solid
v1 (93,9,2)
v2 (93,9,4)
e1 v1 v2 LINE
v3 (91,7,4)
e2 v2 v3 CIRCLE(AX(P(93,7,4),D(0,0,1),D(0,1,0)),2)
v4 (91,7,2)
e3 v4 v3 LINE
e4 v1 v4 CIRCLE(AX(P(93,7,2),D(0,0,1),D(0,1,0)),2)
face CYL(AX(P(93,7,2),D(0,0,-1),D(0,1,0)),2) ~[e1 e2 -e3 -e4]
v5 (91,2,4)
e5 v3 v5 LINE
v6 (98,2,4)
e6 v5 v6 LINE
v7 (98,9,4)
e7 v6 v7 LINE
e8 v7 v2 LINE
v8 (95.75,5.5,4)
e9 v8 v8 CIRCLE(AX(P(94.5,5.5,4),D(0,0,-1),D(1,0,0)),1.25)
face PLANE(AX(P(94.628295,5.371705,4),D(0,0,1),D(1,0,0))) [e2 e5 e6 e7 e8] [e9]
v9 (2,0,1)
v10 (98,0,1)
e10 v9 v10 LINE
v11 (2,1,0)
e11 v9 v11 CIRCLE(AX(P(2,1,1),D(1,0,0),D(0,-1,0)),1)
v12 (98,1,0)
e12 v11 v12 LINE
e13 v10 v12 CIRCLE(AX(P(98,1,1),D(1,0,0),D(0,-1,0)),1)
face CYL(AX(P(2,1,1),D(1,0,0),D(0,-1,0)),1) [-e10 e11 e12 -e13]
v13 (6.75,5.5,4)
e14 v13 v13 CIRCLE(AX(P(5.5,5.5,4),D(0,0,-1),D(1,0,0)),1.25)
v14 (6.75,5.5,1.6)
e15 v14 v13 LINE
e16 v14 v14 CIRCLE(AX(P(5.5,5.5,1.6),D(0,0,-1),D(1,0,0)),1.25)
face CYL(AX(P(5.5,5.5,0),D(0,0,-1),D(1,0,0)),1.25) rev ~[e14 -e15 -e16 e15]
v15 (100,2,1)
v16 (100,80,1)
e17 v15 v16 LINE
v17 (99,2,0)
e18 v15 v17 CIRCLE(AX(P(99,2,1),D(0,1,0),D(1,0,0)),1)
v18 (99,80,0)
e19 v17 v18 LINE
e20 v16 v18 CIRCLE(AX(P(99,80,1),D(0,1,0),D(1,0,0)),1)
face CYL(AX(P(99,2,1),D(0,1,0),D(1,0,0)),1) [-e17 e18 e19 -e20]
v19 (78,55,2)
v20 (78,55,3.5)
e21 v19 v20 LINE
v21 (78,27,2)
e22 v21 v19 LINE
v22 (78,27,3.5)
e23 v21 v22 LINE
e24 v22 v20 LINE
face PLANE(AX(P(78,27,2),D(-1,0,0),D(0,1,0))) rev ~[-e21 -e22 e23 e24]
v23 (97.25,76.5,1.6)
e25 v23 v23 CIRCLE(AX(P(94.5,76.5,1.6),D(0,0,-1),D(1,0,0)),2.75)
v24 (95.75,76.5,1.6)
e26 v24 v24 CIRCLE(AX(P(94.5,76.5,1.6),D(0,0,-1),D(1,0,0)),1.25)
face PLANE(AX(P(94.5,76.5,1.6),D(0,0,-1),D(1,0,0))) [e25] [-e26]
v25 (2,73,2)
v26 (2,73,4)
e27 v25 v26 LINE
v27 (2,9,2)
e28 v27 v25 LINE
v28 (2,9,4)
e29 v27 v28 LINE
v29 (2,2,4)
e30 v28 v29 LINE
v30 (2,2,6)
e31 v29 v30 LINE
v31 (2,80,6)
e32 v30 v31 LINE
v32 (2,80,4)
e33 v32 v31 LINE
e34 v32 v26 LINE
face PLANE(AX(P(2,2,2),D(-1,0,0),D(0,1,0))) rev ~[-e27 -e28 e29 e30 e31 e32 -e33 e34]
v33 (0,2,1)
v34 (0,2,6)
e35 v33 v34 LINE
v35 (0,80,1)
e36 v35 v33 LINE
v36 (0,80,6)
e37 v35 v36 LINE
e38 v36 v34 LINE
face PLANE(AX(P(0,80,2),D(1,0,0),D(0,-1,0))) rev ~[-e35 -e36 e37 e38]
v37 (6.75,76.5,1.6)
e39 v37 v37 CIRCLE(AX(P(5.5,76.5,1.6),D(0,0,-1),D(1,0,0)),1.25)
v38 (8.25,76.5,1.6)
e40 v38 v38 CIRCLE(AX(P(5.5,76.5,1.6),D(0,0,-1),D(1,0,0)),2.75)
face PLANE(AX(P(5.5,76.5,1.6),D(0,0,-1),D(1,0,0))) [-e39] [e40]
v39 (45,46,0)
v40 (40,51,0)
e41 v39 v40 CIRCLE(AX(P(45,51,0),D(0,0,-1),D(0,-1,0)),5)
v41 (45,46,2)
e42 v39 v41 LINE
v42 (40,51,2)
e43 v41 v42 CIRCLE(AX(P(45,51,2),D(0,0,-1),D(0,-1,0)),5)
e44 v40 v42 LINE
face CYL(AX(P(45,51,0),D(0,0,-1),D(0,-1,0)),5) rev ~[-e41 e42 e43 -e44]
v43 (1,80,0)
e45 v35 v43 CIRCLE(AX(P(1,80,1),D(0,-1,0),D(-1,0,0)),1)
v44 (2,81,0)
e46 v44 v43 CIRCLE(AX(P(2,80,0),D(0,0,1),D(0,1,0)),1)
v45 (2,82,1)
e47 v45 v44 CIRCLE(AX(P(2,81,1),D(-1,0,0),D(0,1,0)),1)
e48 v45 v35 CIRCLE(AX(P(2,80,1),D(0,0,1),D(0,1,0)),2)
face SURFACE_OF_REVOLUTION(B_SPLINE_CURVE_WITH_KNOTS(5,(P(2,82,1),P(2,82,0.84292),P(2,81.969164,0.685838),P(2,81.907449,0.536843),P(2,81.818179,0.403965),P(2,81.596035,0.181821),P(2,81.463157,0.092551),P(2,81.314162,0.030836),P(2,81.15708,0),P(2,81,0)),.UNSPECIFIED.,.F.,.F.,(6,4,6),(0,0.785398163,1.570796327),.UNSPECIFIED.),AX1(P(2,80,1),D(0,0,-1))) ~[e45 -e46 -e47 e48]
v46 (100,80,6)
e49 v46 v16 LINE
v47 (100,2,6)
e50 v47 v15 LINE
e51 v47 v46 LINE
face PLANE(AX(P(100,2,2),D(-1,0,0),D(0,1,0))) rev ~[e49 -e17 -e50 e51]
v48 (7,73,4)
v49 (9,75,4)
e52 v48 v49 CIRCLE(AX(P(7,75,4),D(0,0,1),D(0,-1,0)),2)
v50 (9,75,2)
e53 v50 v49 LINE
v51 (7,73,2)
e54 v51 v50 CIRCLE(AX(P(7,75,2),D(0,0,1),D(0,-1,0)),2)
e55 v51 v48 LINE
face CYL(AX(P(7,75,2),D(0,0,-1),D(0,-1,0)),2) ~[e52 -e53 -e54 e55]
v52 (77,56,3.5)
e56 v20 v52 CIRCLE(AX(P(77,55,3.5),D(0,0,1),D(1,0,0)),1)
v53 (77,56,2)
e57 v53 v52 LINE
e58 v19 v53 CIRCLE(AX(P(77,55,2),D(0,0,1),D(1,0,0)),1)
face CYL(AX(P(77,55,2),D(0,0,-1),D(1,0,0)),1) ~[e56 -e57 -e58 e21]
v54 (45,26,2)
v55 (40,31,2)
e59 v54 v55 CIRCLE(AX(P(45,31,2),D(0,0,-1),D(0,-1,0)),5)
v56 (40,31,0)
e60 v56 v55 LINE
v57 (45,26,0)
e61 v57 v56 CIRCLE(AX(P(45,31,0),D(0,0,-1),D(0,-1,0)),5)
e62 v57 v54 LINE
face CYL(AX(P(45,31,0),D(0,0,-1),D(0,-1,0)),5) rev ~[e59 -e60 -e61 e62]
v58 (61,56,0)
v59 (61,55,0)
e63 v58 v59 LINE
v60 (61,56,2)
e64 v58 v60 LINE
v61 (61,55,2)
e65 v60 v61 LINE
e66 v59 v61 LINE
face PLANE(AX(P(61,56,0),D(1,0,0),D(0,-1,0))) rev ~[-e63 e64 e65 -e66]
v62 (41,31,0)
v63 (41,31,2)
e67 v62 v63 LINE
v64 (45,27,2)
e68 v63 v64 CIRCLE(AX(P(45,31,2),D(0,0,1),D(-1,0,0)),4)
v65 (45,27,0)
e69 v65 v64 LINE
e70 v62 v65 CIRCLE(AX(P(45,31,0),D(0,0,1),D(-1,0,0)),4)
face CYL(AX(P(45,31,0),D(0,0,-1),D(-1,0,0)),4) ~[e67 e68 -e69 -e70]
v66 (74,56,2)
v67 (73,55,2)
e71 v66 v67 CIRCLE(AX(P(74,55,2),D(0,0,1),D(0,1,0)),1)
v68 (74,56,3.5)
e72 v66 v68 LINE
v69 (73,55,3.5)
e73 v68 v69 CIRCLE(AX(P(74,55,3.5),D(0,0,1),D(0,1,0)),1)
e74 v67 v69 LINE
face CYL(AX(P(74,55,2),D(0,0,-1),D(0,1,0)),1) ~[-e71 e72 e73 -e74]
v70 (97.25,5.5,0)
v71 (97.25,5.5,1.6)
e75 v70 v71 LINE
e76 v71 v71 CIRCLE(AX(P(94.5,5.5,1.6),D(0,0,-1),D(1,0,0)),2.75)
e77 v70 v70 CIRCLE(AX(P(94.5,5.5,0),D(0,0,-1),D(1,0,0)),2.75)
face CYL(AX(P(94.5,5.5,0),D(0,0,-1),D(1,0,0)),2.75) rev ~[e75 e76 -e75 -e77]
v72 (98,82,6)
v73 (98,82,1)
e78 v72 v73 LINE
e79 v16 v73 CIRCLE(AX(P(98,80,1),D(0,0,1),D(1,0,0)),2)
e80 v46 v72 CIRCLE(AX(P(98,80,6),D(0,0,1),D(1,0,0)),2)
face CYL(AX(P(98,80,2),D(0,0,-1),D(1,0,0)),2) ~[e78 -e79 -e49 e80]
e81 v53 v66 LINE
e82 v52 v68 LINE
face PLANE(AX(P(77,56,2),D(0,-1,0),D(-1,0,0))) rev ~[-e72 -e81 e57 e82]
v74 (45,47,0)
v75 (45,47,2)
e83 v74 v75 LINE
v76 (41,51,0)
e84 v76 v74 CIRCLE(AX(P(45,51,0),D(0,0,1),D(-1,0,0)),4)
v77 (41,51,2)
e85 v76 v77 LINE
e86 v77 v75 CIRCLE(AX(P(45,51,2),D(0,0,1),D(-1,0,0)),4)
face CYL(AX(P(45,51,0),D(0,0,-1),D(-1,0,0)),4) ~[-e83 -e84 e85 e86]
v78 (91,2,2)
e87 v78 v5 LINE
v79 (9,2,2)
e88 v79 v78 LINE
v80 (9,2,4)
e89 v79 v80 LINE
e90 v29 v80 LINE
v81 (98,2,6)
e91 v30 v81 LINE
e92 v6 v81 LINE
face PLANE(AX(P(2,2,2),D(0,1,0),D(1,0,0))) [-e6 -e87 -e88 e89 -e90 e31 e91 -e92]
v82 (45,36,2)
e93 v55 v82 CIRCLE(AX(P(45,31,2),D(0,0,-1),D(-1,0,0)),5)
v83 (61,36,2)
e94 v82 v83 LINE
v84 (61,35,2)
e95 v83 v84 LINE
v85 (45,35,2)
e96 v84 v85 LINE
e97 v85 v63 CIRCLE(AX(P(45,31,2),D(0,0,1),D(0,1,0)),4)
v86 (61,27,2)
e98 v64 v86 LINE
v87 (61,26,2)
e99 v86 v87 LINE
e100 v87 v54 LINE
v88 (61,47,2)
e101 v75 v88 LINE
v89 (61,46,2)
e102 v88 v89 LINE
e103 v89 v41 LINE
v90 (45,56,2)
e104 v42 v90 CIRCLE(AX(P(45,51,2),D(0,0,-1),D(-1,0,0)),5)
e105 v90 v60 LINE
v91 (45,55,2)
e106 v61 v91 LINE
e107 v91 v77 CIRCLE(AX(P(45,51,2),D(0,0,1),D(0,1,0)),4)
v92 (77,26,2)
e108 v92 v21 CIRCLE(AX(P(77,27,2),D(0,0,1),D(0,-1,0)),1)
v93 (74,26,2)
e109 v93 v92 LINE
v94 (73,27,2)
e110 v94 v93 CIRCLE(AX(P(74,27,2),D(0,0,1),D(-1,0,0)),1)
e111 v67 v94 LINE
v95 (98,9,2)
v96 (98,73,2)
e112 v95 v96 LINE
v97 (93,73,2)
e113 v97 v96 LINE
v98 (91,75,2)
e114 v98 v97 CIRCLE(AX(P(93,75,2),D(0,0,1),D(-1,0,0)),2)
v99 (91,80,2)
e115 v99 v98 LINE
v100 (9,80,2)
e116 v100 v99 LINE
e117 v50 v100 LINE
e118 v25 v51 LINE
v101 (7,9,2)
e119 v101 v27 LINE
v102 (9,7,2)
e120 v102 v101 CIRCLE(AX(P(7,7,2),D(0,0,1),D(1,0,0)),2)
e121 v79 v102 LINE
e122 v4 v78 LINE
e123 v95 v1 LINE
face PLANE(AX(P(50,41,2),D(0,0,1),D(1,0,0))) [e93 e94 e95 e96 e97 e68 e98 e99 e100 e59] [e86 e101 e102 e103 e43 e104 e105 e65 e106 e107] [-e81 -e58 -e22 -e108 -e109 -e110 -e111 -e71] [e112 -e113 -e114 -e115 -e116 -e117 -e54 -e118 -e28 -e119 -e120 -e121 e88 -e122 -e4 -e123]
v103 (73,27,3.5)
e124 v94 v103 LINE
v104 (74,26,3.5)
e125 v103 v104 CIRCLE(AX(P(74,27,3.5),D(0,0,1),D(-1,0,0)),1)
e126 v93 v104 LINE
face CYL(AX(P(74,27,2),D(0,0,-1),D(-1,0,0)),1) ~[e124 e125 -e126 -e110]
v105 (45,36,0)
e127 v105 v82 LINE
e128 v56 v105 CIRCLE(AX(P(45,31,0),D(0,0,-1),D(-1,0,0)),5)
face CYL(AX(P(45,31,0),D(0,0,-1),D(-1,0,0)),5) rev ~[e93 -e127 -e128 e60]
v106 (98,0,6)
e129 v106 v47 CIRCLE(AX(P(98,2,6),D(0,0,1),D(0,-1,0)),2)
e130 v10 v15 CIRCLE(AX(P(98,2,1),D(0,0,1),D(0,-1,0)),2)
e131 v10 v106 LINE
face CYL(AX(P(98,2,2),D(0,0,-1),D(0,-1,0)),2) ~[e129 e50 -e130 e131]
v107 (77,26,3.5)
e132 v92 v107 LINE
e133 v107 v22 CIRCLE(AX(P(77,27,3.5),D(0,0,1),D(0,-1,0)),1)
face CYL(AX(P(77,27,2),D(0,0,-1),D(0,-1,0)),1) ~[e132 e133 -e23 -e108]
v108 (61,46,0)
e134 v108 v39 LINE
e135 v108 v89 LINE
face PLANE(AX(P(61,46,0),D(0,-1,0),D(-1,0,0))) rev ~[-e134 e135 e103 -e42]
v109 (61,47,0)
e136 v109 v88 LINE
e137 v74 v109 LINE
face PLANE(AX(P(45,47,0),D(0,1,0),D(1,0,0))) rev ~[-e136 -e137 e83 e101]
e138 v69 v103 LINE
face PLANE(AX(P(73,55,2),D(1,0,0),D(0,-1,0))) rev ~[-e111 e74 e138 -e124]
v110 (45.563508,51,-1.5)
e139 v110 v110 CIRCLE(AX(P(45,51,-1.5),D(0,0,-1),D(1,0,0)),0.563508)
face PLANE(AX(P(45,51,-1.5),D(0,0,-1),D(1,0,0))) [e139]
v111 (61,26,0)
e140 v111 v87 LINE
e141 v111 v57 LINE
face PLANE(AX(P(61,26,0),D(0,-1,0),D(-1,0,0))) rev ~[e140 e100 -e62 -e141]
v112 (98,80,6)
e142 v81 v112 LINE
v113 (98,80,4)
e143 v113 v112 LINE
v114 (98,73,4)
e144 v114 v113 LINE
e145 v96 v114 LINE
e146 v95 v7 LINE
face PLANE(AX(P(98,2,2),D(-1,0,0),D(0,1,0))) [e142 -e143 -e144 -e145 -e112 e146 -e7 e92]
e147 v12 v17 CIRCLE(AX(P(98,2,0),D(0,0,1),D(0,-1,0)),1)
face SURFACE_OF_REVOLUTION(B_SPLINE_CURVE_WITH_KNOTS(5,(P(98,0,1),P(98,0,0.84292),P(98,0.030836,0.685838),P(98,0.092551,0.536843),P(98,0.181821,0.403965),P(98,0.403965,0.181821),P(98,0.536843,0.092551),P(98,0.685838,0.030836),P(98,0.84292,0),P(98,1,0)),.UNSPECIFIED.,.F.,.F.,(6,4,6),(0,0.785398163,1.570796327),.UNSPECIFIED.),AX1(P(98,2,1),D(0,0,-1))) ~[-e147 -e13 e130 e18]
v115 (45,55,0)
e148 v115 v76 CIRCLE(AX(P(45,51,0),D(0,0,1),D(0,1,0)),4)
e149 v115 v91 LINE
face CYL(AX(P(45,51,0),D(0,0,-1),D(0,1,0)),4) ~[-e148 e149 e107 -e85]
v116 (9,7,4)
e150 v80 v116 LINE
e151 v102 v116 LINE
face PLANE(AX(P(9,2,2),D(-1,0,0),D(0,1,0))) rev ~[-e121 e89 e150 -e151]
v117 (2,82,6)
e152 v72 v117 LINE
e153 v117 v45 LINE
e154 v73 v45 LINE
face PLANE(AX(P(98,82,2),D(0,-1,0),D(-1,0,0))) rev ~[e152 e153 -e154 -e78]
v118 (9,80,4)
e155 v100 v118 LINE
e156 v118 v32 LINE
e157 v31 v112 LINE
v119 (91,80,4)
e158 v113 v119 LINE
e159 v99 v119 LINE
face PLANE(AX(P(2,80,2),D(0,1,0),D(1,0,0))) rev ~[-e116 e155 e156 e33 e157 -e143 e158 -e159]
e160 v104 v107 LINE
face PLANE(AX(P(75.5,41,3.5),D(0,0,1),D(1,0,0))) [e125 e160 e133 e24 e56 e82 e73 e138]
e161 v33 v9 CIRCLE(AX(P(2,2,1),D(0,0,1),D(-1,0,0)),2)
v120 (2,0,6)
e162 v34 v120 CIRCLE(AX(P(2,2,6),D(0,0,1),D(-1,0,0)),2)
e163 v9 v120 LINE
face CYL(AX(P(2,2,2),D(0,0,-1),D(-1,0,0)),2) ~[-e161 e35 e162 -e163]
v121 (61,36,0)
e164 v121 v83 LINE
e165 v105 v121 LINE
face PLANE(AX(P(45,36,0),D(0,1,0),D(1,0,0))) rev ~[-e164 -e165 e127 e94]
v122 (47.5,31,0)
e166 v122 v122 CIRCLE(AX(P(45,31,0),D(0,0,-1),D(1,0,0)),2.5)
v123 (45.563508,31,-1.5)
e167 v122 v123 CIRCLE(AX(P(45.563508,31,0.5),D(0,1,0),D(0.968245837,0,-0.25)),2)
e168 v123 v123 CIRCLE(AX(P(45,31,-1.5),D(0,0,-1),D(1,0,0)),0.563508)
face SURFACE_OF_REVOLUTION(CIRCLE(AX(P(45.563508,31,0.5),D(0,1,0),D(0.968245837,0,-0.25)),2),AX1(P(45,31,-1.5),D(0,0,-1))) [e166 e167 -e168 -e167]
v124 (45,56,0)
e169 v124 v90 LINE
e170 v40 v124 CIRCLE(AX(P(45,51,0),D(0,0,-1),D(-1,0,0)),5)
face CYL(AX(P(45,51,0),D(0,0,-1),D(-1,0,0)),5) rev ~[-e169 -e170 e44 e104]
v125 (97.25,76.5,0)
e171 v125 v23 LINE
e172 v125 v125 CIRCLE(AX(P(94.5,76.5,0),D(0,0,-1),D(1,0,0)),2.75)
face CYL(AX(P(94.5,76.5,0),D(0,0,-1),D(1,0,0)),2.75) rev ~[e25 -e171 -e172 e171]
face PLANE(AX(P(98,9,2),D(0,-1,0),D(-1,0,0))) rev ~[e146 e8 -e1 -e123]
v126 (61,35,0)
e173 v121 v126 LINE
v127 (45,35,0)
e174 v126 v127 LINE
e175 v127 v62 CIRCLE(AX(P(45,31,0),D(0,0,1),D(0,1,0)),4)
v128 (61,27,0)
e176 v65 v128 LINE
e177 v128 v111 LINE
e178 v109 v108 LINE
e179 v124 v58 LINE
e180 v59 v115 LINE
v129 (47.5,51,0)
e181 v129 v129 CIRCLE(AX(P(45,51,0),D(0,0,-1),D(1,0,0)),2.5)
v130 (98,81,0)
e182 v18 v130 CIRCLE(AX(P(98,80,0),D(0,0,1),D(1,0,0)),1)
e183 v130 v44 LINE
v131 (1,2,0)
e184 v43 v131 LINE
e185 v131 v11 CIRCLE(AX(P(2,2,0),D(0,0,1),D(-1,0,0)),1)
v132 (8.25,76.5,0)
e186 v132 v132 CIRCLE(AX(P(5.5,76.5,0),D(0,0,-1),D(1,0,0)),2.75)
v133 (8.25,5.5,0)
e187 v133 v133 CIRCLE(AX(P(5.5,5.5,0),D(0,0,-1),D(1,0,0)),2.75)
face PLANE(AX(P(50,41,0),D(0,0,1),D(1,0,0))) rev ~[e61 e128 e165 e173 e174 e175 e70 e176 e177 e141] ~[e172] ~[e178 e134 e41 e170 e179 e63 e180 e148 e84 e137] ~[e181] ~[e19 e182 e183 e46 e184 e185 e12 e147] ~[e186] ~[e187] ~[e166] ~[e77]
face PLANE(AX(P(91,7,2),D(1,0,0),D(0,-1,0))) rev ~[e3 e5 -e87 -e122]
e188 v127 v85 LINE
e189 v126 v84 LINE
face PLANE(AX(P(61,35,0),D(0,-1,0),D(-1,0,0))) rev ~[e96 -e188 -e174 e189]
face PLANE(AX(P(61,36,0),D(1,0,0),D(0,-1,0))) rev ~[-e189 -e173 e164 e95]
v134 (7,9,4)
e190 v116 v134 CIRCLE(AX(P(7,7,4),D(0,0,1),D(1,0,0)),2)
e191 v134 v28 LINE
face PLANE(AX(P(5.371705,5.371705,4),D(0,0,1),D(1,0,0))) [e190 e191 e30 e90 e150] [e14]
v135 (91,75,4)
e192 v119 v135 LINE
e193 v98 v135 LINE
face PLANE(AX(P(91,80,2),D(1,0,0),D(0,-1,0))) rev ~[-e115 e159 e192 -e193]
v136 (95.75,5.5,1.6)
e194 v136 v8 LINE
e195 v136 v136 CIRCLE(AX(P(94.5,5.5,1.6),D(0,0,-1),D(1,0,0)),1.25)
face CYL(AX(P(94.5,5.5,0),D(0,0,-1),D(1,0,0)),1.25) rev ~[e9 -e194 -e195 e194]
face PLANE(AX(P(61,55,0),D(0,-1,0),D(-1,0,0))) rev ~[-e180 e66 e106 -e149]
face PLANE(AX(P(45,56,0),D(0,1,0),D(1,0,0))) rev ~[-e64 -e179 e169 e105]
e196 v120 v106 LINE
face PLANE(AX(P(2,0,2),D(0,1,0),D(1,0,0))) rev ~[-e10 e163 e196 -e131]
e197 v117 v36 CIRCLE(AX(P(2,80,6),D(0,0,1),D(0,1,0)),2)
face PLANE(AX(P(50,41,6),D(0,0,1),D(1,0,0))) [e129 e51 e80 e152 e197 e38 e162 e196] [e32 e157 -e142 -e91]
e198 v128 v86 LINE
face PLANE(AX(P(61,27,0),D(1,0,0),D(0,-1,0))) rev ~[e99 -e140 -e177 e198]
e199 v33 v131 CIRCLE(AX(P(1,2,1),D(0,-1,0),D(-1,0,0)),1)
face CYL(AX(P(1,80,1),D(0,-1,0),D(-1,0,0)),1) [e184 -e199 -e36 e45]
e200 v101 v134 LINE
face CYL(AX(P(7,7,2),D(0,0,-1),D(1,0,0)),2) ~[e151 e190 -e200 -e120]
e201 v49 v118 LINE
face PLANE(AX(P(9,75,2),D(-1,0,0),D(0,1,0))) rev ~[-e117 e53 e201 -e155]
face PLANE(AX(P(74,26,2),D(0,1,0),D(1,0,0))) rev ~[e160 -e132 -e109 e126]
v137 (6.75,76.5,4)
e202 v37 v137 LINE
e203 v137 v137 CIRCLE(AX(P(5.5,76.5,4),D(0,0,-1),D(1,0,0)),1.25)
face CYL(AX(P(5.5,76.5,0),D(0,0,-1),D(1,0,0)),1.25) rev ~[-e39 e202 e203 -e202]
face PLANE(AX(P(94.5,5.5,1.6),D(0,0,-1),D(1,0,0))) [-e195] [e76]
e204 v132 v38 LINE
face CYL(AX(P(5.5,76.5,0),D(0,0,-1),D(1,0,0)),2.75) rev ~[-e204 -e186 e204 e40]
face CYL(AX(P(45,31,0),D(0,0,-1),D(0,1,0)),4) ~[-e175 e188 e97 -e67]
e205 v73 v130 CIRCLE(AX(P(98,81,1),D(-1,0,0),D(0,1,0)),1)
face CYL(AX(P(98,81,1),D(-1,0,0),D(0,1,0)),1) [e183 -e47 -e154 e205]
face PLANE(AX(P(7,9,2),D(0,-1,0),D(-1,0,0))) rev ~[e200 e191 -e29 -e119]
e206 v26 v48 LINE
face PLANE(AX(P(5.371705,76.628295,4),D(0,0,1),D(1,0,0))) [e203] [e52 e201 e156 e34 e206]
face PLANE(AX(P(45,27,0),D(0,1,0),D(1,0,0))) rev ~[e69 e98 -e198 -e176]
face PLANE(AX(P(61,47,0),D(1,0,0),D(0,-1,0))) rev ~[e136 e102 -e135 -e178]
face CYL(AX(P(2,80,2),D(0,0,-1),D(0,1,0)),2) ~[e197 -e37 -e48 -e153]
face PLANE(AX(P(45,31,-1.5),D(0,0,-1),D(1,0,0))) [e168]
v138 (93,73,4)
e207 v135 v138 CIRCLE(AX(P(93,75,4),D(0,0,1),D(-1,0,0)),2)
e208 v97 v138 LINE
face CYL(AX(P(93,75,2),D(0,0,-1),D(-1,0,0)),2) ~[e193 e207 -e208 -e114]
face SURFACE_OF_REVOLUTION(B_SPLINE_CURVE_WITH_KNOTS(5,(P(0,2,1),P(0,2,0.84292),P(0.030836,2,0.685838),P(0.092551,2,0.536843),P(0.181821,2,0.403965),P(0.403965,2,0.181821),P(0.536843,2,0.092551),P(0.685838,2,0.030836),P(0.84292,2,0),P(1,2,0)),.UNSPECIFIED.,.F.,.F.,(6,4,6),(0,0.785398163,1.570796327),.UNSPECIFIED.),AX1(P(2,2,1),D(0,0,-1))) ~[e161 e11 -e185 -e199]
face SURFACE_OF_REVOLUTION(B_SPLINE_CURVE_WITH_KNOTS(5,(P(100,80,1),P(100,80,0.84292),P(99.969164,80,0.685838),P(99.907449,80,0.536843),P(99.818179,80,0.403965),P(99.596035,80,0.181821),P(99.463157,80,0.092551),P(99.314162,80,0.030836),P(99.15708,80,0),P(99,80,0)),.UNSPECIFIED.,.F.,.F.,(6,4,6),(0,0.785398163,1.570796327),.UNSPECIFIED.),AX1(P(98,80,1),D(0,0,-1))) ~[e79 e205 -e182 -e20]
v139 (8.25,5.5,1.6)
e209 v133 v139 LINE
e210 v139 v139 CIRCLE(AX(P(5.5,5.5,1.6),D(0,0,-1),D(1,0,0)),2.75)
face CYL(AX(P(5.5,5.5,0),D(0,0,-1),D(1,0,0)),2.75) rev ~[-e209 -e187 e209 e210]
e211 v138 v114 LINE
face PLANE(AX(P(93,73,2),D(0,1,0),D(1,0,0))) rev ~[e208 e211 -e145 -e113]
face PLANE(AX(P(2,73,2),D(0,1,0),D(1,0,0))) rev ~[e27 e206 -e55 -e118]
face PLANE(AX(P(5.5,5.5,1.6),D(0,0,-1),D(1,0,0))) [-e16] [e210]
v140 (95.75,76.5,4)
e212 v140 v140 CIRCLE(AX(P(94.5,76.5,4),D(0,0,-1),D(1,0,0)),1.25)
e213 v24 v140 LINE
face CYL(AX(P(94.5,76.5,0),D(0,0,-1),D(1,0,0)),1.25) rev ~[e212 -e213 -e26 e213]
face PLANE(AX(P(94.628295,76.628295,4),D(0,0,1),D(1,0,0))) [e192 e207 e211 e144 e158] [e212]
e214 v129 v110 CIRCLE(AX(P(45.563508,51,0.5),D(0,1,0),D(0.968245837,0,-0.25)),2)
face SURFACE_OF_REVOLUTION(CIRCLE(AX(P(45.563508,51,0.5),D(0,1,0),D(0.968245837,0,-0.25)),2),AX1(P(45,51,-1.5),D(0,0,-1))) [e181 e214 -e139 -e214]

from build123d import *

# Parameters (mm, degrees)
F1_DEPTH  = 2
F2_W      = 96
F2_H      = 78
F3_DEPTH  = 4
F5_DEPTH  = 2
F6_R      = 1.25
F7_DEPTH  = 6
F8_R      = 2.75
F9_DEPTH  = 1.6
F11_R     = 1
F13_DEPTH = 2
F12_R     = 2.5
F14_DEPTH = 1.5
F16_DEPTH = 1.5


# Not quite as in the source:
# - a fillet or chamfer that OpenCascade refuses, or shapes differently, is made with other operations: its cross-section is extruded or revolved along the edge and cut away or added


with BuildPart() as f1:
    # F0 (on Top) → F1 (new body)
    with BuildSketch(Plane.XY):
        with BuildLine():
            ThreePointArc((0, 2), (0.5857864376, 0.5857864376), (2, 0))
            Line((2, 0), (98, 0))
            ThreePointArc((98, 0), (99.4142135624, 0.5857864376), (100, 2))
            Line((100, 2), (100, 80))
            ThreePointArc((100, 80), (99.4142135624, 81.4142135624), (98, 82))
            Line((98, 82), (2, 82))
            ThreePointArc((2, 82), (0.5857864376, 81.4142135624), (0, 80))
            Line((0, 80), (0, 2))
        make_face()
    extrude(amount=F1_DEPTH)

    # F2 (on face) → F3 (join)
    with BuildSketch(Plane.XY.offset(2)):
        with BuildLine():
            ThreePointArc((2, 82), (0.5857864376, 81.4142135624), (0, 80))
            Line((0, 80), (0, 2))
            ThreePointArc((0, 2), (0.5857864376, 0.5857864376), (2, 0))
            Line((2, 0), (98, 0))
            ThreePointArc((98, 0), (99.4142135624, 0.5857864376), (100, 2))
            Line((100, 2), (100, 80))
            ThreePointArc((100, 80), (99.4142135624, 81.4142135624), (98, 82))
            Line((98, 82), (2, 82))
        make_face()
        with Locations((50, 41)):
            Rectangle(F2_W, F2_H, mode=Mode.SUBTRACT)
    extrude(amount=F3_DEPTH)

    # F4 (on face) → F5 (join)
    with BuildSketch(Plane.XY.offset(2)):
        with BuildLine():
            Line((2, 9), (2, 2))
            Line((2, 2), (9, 2))
            Line((9, 2), (9, 7))
            ThreePointArc((9, 7), (8.4142135624, 8.4142135624), (7, 9))
            Line((7, 9), (2, 9))
        make_face()
        with BuildLine():
            Line((9, 80), (2, 80))
            Line((2, 80), (2, 73))
            Line((2, 73), (7, 73))
            ThreePointArc((7, 73), (8.4142135624, 73.5857864376), (9, 75))
            Line((9, 75), (9, 80))
        make_face()
        with BuildLine():
            Line((91, 2), (98, 2))
            Line((98, 2), (98, 9))
            Line((98, 9), (93, 9))
            ThreePointArc((93, 9), (91.5857864376, 8.4142135624), (91, 7))
            Line((91, 7), (91, 2))
        make_face()
        with BuildLine():
            Line((98, 73), (98, 80))
            Line((98, 80), (91, 80))
            Line((91, 80), (91, 75))
            ThreePointArc((91, 75), (91.5857864376, 73.5857864376), (93, 73))
            Line((93, 73), (98, 73))
        make_face()
    extrude(amount=F5_DEPTH)

    # F6 (on face) → F7 (cut)
    with BuildSketch(Plane(origin=(0, 0, 0), x_dir=(1, 0, 0), z_dir=(0, 0, -1))):
        with Locations((94.5, -5.5)):
            Circle(F6_R)
        with Locations((94.5, -76.5)):
            Circle(F6_R)
        with Locations((5.5, -76.5)):
            Circle(F6_R)
        with Locations((5.5, -5.5)):
            Circle(F6_R)
    extrude(amount=-F7_DEPTH, mode=Mode.SUBTRACT)

    # F8 (on face) → F9 (cut)
    with BuildSketch(Plane(origin=(0, 0, 0), x_dir=(1, 0, 0), z_dir=(0, 0, -1))):
        with Locations((5.5, -76.5)):
            Circle(F8_R)
        with Locations((5.5, -5.5)):
            Circle(F8_R)
        with Locations((94.5, -5.5)):
            Circle(F8_R)
        with Locations((94.5, -76.5)):
            Circle(F8_R)
    extrude(amount=-F9_DEPTH, mode=Mode.SUBTRACT)

    # F11
    f11_edges = [f1.edges().sort_by_distance(p)[0] for p in [
        (50, 82, 0),
        (0, 41, 0),
        (0.585786, 81.414214, 0),
        (0.585786, 0.585786, 0),
        (50, 0, 0),
        (99.414214, 81.414214, 0),
        (99.414214, 0.585786, 0),
        (100, 41, 0),
    ]]
    fillet(f11_edges, radius=F11_R)

    # F12 (on face) → F13 (cut)
    with BuildSketch(Plane(origin=(0, 0, 0), x_dir=(1, 0, 0), z_dir=(0, 0, -1))):
        with BuildLine():
            Line((61, -26), (45, -26))
            ThreePointArc((45, -26), (41.4644660941, -27.4644660941), (40, -31))
            ThreePointArc((40, -31), (41.4644660941, -34.5355339059), (45, -36))
            Line((45, -36), (61, -36))
            Line((61, -36), (61, -35))
            Line((61, -35), (45, -35))
            ThreePointArc((45, -35), (42.1715728753, -33.8284271247), (41, -31))
            ThreePointArc((41, -31), (42.1715728753, -28.1715728753), (45, -27))
            Line((45, -27), (61, -27))
            Line((61, -27), (61, -26))
        make_face()
        with BuildLine():
            Line((61, -46), (45, -46))
            ThreePointArc((45, -46), (41.4644660941, -47.4644660941), (40, -51))
            ThreePointArc((40, -51), (41.4644660941, -54.5355339059), (45, -56))
            Line((45, -56), (61, -56))
            Line((61, -56), (61, -55))
            Line((61, -55), (45, -55))
            ThreePointArc((45, -55), (42.1715728753, -53.8284271247), (41, -51))
            ThreePointArc((41, -51), (42.1715728753, -48.1715728753), (45, -47))
            Line((45, -47), (61, -47))
            Line((61, -47), (61, -46))
        make_face()
    extrude(amount=-F13_DEPTH, mode=Mode.SUBTRACT)

    # F12 (on face) → F14 (join)
    with BuildSketch(Plane(origin=(0, 0, 0), x_dir=(1, 0, 0), z_dir=(0, 0, -1))):
        with Locations((45, -51)):
            Circle(F12_R)
        with Locations((45, -31)):
            Circle(F12_R)
    extrude(amount=F14_DEPTH)

    # F15: fillet of radius 2 on 2 edges, made by hand

    # F15_s1 → F15_t2 (revolve, cut)
    with BuildSketch(Plane.XZ.offset(-51)):
        with BuildLine():
            ThreePointArc((47.5, 0), (46.7882531983, -1.0811388301), (45.5635083269, -1.5))
            Line((45.5635083269, -1.5), (47.5, -1.5))
            Line((47.5, -1.5), (47.5, 0))
        make_face()
    revolve(axis=Axis((45, 51, -1.5), (0, 0, -1)), mode=Mode.SUBTRACT)

    # F15_s3 → F15_t4 (revolve, cut)
    with BuildSketch(Plane.XZ.offset(-31)):
        with BuildLine():
            ThreePointArc((47.5, 0), (46.7882531983, -1.0811388301), (45.5635083269, -1.5))
            Line((45.5635083269, -1.5), (47.5, -1.5))
            Line((47.5, -1.5), (47.5, 0))
        make_face()
    revolve(axis=Axis((45, 31, -1.5), (0, 0, -1)), mode=Mode.SUBTRACT)

    # F10 (on face) → F16 (join)
    with BuildSketch(Plane.XY.offset(2)):
        with BuildLine():
            ThreePointArc((73, 27), (73.2928932188, 26.2928932188), (74, 26))
            Line((74, 26), (77, 26))
            ThreePointArc((77, 26), (77.7071067812, 26.2928932188), (78, 27))
            Line((78, 27), (78, 55))
            ThreePointArc((78, 55), (77.7071067812, 55.7071067812), (77, 56))
            Line((77, 56), (74, 56))
            ThreePointArc((74, 56), (73.2928932188, 55.7071067812), (73, 55))
            Line((73, 55), (73, 27))
        make_face()
    extrude(amount=F16_DEPTH)


solid = f1.part
